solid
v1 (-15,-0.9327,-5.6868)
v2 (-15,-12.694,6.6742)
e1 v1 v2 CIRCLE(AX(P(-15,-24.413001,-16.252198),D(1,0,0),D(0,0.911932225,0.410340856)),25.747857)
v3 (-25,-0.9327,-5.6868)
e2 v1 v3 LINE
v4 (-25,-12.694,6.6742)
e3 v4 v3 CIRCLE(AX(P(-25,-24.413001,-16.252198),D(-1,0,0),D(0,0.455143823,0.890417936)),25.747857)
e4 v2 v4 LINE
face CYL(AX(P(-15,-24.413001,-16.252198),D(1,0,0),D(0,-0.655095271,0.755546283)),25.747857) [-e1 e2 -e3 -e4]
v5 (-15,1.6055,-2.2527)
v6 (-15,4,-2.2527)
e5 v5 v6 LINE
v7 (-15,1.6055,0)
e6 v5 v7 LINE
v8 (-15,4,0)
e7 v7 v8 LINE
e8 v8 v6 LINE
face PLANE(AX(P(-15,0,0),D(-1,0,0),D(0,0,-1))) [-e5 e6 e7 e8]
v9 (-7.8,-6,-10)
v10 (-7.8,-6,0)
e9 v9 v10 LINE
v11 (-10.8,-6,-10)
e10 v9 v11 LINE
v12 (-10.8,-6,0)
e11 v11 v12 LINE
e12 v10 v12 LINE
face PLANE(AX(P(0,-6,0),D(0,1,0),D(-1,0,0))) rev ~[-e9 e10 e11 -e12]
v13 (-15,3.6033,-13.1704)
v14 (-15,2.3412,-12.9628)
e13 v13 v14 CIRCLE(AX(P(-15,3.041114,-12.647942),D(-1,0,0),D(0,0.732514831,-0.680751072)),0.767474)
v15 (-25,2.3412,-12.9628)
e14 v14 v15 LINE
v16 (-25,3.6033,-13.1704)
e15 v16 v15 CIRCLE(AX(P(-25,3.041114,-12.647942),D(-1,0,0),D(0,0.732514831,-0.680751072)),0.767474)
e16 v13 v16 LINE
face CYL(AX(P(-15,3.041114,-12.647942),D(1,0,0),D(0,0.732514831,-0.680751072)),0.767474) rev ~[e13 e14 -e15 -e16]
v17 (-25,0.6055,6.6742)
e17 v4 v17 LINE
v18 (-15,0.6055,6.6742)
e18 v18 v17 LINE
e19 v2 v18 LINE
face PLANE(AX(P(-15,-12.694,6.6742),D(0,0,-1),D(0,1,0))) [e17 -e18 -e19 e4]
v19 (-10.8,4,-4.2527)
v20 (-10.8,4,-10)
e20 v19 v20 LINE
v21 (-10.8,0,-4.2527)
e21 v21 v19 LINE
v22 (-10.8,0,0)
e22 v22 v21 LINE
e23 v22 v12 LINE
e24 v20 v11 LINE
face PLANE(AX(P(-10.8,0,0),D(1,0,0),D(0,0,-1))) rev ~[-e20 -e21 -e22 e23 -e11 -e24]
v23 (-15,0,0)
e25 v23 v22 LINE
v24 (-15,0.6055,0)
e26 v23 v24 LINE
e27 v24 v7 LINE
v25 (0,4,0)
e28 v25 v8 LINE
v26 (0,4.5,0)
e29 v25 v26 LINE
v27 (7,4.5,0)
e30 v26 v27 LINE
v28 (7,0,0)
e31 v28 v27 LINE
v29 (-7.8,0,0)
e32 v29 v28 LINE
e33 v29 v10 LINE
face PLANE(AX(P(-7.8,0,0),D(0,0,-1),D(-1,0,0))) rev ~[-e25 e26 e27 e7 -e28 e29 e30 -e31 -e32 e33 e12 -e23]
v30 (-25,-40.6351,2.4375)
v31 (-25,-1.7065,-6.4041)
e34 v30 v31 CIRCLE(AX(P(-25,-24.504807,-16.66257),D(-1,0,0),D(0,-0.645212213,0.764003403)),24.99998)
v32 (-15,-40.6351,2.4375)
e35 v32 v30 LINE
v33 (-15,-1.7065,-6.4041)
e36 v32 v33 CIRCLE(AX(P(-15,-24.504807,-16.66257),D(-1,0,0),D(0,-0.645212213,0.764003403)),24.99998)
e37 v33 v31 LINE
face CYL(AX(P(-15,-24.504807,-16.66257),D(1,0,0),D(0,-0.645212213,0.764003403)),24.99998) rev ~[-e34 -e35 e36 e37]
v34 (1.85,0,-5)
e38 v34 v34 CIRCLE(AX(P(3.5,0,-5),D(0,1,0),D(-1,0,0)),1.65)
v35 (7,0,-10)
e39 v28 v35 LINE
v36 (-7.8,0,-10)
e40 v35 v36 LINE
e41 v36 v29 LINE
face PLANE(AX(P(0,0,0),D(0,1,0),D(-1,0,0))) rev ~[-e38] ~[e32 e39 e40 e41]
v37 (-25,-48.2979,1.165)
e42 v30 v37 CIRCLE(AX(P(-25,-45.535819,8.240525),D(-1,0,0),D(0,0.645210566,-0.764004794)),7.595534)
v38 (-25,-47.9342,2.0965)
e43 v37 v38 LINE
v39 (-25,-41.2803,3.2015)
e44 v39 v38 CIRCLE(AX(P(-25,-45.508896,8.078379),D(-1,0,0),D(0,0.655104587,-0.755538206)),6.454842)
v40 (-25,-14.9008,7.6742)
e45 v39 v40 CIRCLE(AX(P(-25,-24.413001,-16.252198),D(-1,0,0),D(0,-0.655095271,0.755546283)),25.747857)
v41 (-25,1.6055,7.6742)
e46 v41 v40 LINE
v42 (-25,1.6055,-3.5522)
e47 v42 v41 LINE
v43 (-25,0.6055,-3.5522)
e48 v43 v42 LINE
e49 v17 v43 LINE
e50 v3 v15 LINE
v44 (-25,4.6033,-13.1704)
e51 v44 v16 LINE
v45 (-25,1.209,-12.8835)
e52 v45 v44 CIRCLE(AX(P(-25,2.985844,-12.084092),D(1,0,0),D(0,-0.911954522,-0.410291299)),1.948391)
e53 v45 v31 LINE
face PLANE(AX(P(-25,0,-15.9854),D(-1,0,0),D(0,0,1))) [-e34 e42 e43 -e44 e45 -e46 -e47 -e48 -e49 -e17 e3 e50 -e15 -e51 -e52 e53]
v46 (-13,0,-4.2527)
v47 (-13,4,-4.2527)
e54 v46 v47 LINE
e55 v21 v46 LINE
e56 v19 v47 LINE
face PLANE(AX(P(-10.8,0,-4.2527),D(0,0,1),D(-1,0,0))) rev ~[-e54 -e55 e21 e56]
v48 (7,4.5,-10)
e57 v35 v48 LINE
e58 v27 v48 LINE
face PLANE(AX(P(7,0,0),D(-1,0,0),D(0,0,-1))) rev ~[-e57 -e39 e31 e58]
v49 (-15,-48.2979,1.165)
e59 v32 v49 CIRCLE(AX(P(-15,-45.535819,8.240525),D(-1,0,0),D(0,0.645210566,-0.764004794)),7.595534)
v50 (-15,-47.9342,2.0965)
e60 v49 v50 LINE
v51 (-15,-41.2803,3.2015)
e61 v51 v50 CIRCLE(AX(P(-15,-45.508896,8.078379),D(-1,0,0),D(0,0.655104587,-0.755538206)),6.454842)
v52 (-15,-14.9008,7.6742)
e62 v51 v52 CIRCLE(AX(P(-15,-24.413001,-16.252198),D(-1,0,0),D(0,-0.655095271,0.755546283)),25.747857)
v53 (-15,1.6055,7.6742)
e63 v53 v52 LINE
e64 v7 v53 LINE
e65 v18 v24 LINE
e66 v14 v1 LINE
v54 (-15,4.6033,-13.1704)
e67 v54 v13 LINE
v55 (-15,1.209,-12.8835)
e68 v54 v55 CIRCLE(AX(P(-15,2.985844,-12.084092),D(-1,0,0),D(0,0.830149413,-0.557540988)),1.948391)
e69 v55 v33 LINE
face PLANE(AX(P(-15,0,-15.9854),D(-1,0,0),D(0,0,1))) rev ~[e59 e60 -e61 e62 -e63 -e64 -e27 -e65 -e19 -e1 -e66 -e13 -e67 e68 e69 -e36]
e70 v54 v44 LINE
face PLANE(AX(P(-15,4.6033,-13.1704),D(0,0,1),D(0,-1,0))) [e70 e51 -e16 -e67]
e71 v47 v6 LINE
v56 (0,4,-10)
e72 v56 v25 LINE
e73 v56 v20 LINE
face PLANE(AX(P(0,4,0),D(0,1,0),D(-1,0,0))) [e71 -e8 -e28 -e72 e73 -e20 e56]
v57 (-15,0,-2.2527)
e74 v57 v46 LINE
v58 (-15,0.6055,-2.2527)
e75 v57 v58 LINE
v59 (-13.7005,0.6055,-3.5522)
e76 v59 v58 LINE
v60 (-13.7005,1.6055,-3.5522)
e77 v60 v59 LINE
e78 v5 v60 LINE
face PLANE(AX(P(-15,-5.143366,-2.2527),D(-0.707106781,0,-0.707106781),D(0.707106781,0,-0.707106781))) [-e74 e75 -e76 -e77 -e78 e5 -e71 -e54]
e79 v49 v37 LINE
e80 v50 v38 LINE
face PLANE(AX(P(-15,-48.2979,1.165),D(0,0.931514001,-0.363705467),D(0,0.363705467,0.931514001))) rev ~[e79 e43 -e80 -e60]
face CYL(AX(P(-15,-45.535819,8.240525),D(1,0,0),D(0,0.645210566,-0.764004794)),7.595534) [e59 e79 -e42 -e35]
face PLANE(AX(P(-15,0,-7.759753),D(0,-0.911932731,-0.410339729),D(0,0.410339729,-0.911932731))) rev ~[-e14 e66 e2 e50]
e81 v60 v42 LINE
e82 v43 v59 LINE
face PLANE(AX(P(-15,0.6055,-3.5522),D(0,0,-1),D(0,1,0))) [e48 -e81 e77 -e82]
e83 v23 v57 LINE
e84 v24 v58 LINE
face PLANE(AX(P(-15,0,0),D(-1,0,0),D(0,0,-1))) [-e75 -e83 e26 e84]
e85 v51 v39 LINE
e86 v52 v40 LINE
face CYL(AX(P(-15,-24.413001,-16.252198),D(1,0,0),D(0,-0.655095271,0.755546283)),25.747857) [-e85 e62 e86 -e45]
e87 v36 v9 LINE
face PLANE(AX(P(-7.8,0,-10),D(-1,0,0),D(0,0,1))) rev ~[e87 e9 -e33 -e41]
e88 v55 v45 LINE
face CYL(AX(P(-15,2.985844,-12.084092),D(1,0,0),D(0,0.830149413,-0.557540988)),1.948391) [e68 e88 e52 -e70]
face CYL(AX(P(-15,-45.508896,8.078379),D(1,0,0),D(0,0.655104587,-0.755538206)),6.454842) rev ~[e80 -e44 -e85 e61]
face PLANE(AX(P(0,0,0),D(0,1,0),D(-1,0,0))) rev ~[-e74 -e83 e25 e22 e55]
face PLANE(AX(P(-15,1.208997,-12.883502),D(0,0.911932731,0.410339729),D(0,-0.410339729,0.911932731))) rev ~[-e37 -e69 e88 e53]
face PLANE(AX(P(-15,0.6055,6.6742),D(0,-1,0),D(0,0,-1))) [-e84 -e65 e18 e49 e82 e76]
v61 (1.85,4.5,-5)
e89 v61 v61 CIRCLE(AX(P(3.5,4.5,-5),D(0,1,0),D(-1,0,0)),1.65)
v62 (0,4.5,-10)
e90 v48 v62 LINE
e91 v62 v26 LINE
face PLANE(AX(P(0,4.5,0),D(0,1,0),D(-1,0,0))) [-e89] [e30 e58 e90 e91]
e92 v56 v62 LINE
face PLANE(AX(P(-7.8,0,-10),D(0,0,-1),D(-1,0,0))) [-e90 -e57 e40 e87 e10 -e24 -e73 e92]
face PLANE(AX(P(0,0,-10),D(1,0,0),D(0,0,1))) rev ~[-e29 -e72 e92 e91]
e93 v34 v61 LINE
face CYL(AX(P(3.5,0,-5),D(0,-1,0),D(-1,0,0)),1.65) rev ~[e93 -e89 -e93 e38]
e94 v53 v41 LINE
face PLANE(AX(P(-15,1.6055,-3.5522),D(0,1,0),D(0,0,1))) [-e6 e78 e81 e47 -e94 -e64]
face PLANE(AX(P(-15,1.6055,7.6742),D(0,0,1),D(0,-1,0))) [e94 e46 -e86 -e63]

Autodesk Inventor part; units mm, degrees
ref_plane "YZ Plane" through (0, 0, 0) normal (1, 0, 0) x (0, 1, 0)
ref_plane "XZ Plane" through (0, 0, 0) normal (0, 1, 0) x (-1, 0, 0)
sketch "Sketch2" plane through (0, 0, 0) normal (0, 1, 0) x (-1, 0, 0)
  line L0 (0, 0) -> (-7, 0)
  line L1 (-7, 0) -> (-7, -10)
  line L2 (-7, -10) -> (0, -10)
  line L3 (0, -10) -> (0, 0)
  circle A0 centre (-3.5, -5) radius 1.65
  line L4 (0, 0) -> (15, 0)
  line L5 (15, 0) -> (15, -15.9854)
  line L6 (15, -15.9854) -> (0, -15.9854)
  line L7 (0, -15.9854) -> (0, 0)
  line L8 (7.8, 0) -> (10.8, 0)
  line L9 (10.8, 0) -> (10.8, -15.9854)
  line L10 (10.8, -15.9854) -> (7.8, -15.9854)
  line L11 (7.8, -15.9854) -> (7.8, 0)
  line L12 (15, -15.9854) -> (10.8, -15.9854)
  line L13 (10.8, -15.9854) -> (10.8, -4.2527)
  line L14 (10.8, -4.2527) -> (15, -4.2527)
  line L15 (15, -4.2527) -> (15, -15.9854)
  line L16 (0, -10) -> (10.8, -10)
  point P0 (0, -5)
  point P1 (-3.5, -10)
  point P2 (10.8, 0)
  point P3 (15, -4.2527)
  point P4 (7.8, -10)
  dimension "d2" = 7
  dimension "d3" = 10
  dimension "d4" = 3.3
  dimension "d12" = 22
  dimension "d21" = 11.3
  dimension "d22" = 3
extrude "Extrusion1" add sketch "Sketch2" along normal blind 4.5 contours L3 L2 L1 L0
extrude "Extrusion2" add sketch "Sketch2" along normal blind 4 contours L4 L11 L16 L3 | L4 L9 L16 L11 | L4 L5 L14 L9
ref_plane "Work Plane1" through (0, 0, 0) normal (0, -0.9396926, -0.3420201) x (-1, 0, 0)
sketch "Sketch4" plane through (-15, 0, -15.9854) normal (-1, 0, 0) x (0, 0, 1)
  line L0 (-0.8784, 3) -> (12.8006, -3.1551)
  line L1 (12.8006, -3.1551) -> (13.2109, -2.2432)
  line L2 (13.2109, -2.2432) -> (-0.4681, 3.9119)
  line L3 (-0.8784, 3) -> (-0.4681, 3.9119)
  arc A0 (18.4229, -40.6351) -> (9.5813, -1.7065) centre (-0.6772, -24.5048) ccw
  line L4 (18.4229, -40.6351) -> (19.1869, -41.2803)
  line L5 (9.5813, -1.7065) -> (10.2986, -0.9327)
  arc A1 (19.1869, -41.2803) -> (10.2986, -0.9327) centre (-0.2668, -24.413) ccw
  arc A2 (18.4229, -40.6351) -> (17.1504, -48.2979) centre (24.2261, -45.5359) ccw
  arc A3 (19.1869, -41.2803) -> (18.0819, -47.9342) centre (24.064, -45.509) ccw
  line L6 (17.1504, -48.2979) -> (18.0819, -47.9342)
  line L7 (22.6596, -12.694) -> (22.6596, 0.6055)
  line L8 (22.6596, 0.6055) -> (12.4332, 0.6055)
  line L9 (12.4332, 0.6055) -> (12.4332, 1.6055)
  line L10 (12.4332, 1.6055) -> (23.6596, 1.6055)
  line L11 (23.6596, 1.6055) -> (23.6596, -14.9008)
  line L12 (5.9854, 0) -> (11.7327, 0) projected
  arc A4 (2.815, 4.6033) -> (3.1019, 1.209) centre (3.9014, 2.9858) ccw
  line L13 (2.815, 4.6033) -> (2.815, 3.6033)
  arc A5 (2.815, 3.6033) -> (3.0226, 2.3412) centre (3.3375, 3.0411) ccw
  point P0 (15.9854, 0)
  point P1 (13.4215, -1.7995)
  point P2 (1.9601, 2.8193)
  point P3 (2.654, 2.6401)
  dimension "d14" = 1
  dimension "d20" = 15
  dimension "d26" = 25
  dimension "d27" = 1
  dimension "d29" = 1
  dimension "d30" = 1
  dimension "d31" = 1
  dimension "d35" = 3
  dimension "d37" = 1
  dimension "d38" = 1
extrude "Extrusion4" add sketch "Sketch4" along normal blind 10 contours A4 L2 L5 L0 | L5 A1 L1 L0 | L0 L1 A1 L4 A0 | A4 L13 A5 L2 | L4 A3 L6 A2 | L7 L8 L9 L10 L11 A1
extrude "Extrusion5" add sketch "Sketch2" against normal blind 6 contours L4 L9 L16 L11
chamfer "Chamfer1" distance 2 angle 45 1 edges at (-15, 2, -4.2527)
properties part number "spool_blocker"
